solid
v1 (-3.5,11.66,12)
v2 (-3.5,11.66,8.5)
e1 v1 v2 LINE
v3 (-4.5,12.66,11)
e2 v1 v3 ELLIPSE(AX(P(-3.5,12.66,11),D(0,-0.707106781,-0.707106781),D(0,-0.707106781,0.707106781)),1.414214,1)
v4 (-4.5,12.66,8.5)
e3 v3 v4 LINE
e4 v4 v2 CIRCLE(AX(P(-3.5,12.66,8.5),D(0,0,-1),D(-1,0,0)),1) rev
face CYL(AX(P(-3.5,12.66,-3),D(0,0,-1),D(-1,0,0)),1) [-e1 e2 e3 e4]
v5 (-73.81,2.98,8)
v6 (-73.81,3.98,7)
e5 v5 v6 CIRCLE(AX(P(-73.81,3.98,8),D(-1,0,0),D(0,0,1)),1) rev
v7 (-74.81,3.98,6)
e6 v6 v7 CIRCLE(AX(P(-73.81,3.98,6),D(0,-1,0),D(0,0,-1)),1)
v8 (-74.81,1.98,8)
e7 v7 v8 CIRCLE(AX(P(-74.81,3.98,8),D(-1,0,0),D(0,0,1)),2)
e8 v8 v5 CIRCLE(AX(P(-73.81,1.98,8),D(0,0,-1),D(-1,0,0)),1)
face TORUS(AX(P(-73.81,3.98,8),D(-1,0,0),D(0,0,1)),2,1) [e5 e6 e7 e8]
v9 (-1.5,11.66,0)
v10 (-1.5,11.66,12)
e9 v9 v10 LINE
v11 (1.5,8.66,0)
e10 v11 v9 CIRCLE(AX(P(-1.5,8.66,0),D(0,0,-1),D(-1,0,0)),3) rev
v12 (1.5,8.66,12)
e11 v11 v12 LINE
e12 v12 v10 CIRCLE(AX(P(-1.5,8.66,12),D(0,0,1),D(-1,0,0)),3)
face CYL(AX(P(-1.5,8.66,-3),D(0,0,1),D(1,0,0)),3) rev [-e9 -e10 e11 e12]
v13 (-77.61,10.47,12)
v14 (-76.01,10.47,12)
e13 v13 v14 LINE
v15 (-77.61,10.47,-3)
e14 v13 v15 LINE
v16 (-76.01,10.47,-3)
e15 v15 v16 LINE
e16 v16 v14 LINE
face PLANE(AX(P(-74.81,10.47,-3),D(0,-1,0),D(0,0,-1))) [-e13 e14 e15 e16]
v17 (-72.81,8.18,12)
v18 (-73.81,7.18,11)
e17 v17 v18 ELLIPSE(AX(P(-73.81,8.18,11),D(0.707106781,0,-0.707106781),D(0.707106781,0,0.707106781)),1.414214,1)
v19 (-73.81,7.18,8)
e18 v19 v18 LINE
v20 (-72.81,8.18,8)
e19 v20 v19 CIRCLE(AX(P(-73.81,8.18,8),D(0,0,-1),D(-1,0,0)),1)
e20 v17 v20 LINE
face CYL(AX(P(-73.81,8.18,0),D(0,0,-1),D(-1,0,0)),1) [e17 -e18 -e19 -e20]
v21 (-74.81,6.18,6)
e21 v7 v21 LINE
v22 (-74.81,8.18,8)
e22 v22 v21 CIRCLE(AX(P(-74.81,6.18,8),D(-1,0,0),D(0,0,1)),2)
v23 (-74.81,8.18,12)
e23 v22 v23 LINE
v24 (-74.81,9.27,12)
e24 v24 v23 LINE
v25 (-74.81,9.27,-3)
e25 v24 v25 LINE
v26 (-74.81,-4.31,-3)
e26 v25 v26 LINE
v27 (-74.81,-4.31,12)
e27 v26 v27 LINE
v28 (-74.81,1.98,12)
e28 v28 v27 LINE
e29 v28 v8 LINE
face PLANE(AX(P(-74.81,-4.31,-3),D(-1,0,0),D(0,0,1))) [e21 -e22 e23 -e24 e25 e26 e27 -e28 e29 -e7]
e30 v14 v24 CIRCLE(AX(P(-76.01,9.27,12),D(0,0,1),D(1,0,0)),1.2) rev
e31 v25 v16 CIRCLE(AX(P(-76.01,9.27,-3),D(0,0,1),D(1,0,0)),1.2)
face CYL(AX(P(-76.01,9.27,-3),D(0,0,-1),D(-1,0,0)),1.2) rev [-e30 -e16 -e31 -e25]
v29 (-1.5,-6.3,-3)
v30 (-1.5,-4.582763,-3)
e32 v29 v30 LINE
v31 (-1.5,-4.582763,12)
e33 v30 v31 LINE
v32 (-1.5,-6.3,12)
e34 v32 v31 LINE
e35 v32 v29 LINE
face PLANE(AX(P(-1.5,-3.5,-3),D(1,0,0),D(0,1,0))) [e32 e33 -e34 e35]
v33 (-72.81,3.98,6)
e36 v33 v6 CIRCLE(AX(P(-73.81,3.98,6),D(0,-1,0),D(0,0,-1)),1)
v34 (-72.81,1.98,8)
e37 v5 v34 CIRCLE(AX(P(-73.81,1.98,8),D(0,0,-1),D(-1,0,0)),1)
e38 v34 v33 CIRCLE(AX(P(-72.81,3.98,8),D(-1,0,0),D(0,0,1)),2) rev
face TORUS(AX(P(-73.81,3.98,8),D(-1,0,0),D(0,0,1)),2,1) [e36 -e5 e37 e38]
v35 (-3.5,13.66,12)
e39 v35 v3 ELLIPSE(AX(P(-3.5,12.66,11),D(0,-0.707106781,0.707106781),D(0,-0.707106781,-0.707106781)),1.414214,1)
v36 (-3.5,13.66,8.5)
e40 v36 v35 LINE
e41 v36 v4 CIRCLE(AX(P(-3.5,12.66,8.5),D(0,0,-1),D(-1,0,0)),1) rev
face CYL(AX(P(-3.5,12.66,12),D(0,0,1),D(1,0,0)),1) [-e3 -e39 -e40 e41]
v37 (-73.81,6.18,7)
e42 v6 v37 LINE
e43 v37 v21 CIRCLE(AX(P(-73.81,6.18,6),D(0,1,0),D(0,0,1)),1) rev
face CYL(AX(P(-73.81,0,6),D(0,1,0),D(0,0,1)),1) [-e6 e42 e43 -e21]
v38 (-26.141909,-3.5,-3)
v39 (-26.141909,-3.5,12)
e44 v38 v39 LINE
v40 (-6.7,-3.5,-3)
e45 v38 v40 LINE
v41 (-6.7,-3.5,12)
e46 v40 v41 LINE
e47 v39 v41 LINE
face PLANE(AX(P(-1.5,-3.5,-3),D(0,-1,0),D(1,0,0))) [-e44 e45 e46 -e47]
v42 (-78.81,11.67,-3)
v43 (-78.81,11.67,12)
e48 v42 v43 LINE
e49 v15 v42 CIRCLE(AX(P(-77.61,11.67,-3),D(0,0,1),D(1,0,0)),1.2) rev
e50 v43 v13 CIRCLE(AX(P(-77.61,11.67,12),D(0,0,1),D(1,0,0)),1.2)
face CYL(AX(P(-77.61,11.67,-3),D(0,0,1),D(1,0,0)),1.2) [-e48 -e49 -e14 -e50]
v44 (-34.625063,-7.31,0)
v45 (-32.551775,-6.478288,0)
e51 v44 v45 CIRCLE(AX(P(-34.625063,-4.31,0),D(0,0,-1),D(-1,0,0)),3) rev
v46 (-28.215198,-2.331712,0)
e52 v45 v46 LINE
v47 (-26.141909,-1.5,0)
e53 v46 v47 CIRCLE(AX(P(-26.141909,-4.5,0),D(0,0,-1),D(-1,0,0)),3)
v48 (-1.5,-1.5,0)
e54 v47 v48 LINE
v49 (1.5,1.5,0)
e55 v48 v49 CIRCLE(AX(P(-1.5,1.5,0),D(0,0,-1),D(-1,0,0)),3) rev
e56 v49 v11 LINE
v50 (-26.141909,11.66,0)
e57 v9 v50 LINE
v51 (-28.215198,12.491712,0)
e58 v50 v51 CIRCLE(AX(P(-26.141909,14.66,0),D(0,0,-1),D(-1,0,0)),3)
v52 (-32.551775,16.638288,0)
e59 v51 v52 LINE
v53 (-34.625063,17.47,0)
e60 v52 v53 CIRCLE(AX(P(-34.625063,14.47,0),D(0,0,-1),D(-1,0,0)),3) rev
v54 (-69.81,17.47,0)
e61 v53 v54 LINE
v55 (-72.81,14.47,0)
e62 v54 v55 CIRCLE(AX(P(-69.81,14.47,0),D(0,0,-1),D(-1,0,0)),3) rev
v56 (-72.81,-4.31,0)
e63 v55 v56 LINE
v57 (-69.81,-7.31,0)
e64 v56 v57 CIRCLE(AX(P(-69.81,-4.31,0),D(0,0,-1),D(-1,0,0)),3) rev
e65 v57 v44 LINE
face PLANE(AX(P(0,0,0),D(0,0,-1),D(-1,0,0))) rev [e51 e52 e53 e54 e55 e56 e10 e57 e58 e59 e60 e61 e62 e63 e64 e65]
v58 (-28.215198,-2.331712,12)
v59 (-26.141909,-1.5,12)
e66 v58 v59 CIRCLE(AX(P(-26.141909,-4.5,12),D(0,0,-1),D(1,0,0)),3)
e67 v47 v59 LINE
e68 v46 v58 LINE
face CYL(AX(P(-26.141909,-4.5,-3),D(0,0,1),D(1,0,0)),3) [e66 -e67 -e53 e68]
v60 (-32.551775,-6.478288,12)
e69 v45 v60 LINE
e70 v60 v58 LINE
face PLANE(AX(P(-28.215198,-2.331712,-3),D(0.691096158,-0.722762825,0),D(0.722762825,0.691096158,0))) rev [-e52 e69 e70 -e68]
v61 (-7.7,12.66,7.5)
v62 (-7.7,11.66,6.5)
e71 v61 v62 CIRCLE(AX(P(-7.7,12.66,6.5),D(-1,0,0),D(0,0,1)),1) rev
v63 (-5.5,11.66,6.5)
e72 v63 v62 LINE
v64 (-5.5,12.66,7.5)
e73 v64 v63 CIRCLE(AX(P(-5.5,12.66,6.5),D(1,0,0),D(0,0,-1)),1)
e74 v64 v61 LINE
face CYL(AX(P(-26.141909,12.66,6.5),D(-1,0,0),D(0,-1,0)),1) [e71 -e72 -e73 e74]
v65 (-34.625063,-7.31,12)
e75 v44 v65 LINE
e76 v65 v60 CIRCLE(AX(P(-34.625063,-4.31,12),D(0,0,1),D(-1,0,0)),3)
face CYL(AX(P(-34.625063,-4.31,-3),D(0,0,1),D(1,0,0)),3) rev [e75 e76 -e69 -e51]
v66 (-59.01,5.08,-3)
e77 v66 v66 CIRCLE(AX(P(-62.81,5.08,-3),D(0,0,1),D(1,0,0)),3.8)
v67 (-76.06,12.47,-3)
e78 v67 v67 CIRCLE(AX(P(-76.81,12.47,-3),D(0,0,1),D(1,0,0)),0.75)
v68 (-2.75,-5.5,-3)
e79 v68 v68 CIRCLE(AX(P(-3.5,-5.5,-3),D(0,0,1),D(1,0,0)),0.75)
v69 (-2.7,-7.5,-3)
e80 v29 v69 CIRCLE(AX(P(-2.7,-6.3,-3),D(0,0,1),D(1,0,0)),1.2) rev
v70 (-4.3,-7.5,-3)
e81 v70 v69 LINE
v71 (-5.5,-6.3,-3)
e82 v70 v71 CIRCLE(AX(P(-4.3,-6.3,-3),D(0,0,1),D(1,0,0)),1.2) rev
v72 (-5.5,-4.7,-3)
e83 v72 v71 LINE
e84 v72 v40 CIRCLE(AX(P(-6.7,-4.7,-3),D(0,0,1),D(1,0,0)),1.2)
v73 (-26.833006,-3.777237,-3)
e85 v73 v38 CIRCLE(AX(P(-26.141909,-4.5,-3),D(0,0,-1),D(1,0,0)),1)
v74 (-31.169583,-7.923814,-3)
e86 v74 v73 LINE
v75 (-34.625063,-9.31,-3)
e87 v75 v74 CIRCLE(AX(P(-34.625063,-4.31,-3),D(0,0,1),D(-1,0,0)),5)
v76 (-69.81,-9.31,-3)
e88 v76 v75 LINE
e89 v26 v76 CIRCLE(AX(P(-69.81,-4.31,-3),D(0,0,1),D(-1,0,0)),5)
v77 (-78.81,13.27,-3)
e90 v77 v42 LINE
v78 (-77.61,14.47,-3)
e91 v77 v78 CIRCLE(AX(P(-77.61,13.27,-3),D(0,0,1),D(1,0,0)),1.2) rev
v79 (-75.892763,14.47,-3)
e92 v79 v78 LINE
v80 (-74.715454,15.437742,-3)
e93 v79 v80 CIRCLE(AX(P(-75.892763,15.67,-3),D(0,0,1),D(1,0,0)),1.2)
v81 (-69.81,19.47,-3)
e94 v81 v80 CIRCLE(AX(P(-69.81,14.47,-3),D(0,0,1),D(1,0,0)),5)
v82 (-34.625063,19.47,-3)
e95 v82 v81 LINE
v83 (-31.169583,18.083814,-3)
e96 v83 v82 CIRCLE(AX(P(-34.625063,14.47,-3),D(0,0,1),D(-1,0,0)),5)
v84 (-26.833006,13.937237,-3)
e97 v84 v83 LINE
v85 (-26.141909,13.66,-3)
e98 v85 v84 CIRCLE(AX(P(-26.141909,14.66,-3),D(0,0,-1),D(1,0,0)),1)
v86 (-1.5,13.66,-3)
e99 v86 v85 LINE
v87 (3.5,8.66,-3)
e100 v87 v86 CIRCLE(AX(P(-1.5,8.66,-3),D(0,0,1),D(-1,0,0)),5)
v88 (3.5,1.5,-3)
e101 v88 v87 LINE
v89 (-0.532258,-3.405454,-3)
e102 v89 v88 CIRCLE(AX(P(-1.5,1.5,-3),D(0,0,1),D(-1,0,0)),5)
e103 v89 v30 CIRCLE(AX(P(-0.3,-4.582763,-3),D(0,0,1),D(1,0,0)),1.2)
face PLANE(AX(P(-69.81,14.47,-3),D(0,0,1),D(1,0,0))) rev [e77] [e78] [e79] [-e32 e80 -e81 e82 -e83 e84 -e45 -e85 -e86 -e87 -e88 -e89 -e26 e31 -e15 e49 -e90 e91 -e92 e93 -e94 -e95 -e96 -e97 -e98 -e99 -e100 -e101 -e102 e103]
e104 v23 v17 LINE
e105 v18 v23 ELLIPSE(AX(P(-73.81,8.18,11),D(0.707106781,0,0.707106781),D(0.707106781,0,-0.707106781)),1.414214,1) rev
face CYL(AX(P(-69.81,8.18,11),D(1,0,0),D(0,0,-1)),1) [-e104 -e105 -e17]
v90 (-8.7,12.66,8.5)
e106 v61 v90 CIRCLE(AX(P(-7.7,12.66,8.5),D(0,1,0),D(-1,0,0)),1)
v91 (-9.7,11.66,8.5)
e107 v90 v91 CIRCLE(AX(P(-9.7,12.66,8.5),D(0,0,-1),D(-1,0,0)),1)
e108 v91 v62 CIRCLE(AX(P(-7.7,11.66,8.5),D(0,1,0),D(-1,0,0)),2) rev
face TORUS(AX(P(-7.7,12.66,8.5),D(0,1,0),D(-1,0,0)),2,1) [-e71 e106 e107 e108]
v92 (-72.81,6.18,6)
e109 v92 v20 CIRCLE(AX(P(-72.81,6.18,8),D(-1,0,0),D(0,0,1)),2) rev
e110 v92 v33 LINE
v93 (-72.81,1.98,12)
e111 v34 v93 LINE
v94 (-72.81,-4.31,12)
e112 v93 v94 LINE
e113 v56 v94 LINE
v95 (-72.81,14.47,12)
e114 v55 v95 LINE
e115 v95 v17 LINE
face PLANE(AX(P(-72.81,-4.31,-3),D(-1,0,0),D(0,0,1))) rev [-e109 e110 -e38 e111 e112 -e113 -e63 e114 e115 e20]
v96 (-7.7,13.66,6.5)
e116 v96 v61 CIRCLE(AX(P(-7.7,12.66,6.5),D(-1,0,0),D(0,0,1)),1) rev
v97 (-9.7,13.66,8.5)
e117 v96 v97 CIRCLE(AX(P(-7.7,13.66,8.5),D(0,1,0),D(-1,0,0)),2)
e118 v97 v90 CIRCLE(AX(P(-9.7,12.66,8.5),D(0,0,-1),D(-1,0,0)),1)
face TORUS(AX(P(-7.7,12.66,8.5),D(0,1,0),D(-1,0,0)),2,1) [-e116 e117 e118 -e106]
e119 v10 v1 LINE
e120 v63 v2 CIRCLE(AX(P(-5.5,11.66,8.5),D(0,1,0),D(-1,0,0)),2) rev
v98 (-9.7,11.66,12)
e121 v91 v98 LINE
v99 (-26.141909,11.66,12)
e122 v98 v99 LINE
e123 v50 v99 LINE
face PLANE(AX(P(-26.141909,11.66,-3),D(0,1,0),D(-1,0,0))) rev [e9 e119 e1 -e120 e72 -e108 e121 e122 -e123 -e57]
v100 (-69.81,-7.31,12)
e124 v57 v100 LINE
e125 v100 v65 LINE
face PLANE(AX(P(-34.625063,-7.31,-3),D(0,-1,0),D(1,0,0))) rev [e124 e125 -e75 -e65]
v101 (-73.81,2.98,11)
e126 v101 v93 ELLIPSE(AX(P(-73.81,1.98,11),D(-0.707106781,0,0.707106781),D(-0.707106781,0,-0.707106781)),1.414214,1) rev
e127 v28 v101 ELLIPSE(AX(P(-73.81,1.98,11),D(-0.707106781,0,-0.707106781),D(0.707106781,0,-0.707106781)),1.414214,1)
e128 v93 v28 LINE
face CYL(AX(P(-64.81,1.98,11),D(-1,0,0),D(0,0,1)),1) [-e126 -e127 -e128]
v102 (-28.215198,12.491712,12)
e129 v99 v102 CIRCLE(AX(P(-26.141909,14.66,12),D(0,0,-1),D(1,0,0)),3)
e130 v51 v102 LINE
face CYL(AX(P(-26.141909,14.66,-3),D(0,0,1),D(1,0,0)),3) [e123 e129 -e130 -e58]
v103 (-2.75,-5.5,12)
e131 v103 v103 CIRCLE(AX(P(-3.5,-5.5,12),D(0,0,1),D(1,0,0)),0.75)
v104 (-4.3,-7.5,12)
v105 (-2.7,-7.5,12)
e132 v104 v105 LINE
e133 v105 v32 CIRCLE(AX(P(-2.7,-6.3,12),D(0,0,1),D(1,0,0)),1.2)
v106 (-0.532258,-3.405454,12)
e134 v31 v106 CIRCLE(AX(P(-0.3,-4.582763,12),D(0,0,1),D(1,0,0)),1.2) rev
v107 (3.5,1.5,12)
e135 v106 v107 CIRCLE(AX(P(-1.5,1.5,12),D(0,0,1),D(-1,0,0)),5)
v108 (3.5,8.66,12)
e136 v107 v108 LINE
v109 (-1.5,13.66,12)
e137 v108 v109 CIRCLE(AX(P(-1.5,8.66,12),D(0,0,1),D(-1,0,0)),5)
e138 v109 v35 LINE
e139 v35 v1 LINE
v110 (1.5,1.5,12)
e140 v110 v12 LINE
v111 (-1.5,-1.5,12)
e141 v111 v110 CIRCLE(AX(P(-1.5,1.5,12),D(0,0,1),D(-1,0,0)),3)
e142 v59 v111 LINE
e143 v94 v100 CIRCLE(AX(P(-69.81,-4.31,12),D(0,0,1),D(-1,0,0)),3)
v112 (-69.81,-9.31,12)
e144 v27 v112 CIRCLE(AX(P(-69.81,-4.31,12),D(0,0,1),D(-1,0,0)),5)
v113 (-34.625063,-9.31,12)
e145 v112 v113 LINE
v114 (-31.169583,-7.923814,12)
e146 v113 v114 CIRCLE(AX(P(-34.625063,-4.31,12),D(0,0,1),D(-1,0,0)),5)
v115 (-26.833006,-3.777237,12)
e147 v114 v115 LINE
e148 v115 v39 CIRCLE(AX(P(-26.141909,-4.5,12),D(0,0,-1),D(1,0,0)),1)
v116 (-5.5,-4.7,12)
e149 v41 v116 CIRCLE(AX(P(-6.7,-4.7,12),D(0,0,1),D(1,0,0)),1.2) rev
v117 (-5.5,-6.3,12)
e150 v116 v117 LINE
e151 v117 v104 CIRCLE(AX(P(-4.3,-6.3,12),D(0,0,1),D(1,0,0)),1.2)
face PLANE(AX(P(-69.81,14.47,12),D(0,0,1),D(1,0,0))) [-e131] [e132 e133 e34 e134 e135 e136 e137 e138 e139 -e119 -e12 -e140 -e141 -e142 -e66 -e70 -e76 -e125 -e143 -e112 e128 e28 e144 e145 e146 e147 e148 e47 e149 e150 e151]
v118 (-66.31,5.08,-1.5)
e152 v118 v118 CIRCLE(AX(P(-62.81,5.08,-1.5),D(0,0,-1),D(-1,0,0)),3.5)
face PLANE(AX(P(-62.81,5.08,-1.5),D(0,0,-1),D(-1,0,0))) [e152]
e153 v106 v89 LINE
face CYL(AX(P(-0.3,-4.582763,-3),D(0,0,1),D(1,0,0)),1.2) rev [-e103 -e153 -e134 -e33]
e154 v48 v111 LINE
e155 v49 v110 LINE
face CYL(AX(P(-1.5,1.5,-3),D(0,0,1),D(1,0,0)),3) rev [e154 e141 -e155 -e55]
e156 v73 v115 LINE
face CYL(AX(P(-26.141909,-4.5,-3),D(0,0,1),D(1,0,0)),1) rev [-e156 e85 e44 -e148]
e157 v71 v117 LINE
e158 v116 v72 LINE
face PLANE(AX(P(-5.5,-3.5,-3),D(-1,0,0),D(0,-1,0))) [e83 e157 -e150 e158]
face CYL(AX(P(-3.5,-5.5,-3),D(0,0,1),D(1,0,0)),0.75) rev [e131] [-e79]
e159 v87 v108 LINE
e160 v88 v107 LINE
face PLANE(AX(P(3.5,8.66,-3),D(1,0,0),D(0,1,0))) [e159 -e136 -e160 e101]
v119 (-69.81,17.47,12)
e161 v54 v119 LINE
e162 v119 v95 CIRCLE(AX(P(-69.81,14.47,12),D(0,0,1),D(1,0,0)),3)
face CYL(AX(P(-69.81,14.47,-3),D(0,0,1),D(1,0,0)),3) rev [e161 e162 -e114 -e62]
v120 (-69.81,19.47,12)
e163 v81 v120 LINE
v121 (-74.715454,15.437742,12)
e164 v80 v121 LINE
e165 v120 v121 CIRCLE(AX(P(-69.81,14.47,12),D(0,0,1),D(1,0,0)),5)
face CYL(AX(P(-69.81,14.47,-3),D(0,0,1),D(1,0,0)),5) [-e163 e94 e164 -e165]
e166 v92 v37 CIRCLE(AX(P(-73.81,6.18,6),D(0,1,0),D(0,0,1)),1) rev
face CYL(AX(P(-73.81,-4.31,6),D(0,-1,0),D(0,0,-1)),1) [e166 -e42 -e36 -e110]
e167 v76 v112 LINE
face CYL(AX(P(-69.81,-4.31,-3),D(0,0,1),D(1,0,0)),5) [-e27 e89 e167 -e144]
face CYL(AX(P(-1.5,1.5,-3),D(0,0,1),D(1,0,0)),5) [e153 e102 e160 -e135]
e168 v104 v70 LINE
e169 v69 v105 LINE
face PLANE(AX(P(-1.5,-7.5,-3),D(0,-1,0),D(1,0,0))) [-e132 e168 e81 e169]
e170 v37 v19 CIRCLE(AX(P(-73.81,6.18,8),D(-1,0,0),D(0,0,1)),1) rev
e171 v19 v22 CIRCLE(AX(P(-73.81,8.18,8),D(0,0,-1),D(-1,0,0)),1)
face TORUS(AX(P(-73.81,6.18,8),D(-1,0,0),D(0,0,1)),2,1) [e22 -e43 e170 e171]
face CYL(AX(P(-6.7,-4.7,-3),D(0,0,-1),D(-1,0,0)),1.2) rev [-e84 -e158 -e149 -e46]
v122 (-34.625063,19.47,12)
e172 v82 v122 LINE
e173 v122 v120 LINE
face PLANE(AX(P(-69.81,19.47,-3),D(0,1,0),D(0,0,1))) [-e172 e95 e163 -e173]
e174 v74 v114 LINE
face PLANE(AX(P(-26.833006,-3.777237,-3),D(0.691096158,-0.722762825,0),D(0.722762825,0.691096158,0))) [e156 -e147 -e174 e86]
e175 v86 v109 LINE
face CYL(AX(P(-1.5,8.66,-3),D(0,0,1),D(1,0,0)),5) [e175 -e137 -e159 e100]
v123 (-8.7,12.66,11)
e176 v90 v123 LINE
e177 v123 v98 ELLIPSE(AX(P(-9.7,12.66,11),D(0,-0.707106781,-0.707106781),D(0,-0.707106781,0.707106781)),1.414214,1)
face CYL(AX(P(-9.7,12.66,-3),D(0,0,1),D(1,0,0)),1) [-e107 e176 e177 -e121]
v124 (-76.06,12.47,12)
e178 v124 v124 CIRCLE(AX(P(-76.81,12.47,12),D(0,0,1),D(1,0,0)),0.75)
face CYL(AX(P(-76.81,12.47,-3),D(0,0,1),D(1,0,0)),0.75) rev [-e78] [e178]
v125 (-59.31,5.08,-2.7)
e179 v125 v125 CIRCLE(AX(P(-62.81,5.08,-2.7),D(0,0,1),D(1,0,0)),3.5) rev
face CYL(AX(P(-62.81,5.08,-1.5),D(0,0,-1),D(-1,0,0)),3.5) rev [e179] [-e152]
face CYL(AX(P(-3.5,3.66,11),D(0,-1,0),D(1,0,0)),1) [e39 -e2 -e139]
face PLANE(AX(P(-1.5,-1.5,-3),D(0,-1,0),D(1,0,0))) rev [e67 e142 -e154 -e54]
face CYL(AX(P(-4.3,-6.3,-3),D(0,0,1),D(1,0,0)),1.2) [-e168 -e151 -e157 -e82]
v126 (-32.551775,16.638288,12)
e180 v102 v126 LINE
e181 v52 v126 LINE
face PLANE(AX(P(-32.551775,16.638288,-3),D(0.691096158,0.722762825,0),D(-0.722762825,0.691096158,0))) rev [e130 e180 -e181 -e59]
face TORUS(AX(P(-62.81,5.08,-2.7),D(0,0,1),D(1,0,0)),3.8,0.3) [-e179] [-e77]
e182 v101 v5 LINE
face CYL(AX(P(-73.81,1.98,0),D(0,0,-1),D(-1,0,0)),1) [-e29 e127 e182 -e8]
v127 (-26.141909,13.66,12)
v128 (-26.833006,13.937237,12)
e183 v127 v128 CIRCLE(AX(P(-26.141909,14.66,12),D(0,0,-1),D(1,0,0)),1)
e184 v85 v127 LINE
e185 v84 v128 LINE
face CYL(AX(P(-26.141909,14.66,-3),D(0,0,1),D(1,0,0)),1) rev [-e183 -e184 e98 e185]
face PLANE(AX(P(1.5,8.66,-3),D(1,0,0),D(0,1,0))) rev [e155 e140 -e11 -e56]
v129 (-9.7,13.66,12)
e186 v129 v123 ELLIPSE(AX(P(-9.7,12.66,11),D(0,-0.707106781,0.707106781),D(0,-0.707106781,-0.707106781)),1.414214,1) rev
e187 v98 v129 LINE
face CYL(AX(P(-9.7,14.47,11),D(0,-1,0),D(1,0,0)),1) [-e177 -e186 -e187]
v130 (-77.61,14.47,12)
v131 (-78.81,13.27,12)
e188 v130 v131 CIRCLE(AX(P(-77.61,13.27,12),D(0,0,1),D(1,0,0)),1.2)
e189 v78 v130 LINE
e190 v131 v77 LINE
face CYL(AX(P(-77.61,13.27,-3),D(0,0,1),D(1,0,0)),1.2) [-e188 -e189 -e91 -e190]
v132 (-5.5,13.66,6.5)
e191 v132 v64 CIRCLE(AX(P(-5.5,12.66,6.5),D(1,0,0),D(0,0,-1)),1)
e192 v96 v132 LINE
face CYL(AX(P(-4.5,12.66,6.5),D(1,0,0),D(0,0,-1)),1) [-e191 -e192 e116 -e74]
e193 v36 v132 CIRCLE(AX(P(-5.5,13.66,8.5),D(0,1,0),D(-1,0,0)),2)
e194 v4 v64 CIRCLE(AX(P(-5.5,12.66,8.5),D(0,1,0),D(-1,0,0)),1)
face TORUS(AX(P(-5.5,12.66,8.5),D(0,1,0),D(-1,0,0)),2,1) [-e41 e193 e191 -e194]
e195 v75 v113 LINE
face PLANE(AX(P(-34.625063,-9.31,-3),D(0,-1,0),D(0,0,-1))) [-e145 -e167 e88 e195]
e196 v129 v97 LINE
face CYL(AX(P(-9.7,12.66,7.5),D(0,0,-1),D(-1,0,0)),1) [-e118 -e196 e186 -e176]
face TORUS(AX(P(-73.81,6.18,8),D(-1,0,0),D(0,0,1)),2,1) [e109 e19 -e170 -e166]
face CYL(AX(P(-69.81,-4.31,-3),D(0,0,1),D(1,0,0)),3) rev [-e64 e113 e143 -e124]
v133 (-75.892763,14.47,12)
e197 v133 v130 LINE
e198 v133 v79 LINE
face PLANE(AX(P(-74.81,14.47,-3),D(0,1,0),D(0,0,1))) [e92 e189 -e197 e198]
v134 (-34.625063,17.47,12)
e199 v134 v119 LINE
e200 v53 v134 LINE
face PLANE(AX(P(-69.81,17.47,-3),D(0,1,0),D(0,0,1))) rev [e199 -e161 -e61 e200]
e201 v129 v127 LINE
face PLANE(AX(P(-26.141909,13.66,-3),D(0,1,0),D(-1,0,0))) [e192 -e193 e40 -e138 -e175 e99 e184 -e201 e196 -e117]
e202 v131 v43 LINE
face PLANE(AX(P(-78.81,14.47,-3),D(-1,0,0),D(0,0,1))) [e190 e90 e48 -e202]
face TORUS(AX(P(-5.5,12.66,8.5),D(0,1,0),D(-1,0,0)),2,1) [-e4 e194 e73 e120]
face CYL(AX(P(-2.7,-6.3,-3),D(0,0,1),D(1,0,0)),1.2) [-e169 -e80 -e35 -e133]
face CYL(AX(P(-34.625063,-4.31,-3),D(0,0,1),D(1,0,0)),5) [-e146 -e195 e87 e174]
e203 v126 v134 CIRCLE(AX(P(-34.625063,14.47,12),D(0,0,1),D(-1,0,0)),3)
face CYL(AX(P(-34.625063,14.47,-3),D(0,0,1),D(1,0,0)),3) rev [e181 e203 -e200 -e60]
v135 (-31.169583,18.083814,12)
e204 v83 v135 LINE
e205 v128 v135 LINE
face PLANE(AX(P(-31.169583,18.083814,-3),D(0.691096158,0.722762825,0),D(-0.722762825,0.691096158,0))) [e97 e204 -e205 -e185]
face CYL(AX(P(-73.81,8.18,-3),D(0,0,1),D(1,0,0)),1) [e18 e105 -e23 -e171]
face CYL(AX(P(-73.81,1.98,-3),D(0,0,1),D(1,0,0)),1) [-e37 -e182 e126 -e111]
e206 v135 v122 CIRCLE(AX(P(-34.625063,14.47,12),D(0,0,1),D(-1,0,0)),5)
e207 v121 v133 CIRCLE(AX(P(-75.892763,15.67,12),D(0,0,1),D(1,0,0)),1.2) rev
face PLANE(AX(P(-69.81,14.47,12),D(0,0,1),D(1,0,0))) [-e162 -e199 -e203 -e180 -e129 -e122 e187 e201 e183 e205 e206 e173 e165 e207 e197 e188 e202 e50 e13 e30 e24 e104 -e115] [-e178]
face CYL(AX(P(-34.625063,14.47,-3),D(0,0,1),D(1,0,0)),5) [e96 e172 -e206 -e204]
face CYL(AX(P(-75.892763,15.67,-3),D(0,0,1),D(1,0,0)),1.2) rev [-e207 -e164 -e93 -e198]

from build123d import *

# Parameters (mm, degrees)
BOSS_EXTRUDE2_DEPTH      = 12
BOSS_EXTRUDE2_DEPTH_BACK = 3
BOSS_EXTRUDE3_DEPTH      = 3
SKETCH6_W                = 5
SKETCH6_H                = 2.1
CUT_EXTRUDE1_DEPTH       = 10
SKETCH7_W                = 4.2
SKETCH7_H                = 4.5
CUT_EXTRUDE2_DEPTH       = 10
FILLET1_R                = 1
SKETCH8_W                = 4
SKETCH8_H                = 4
BOSS_EXTRUDE4_DEPTH      = 15
FILLET2_R                = 1.2
SKETCH9_R                = 0.75
CUT_EXTRUDE3_DEPTH       = 83.553600769
SKETCH10_R               = 3.5
CUT_EXTRUDE4_DEPTH       = 1.5
FILLET3_R                = 0.3


with BuildPart() as part:
    # Sketch3 → Boss-Extrude2 (new, two sides: drawn at the far end of the back side and taken through both)
    with BuildSketch(Plane.XY.offset(-BOSS_EXTRUDE2_DEPTH_BACK)):
        with BuildLine():
            Line((-69.81, 19.47), (-34.625063383, 19.47))
            ThreePointArc((-34.625063383, 19.47), (-32.763487521, 19.110531791), (-31.169582594, 18.083814123))
            Line((-31.169582594, 18.083814123), (-26.833005647, 13.937237175))
            ThreePointArc((-26.833005647, 13.937237175), (-26.514224661, 13.731893642), (-26.141909489, 13.66))
            Line((-26.141909489, 13.66), (-1.5, 13.66))
            ThreePointArc((-1.5, 13.66), (2.035533906, 12.195533906), (3.5, 8.66))
            Line((3.5, 8.66), (3.5, 1.5))
            ThreePointArc((3.5, 1.5), (2.035533906, -2.035533906), (-1.5, -3.5))
            Line((-1.5, -3.5), (-26.141909489, -3.5))
            ThreePointArc((-26.141909489, -3.5), (-26.514224661, -3.571893642), (-26.833005647, -3.777237175))
            Line((-26.833005647, -3.777237175), (-31.169582594, -7.923814123))
            ThreePointArc((-31.169582594, -7.923814123), (-32.763487521, -8.950531791), (-34.625063383, -9.31))
            Line((-34.625063383, -9.31), (-69.81, -9.31))
            ThreePointArc((-69.81, -9.31), (-73.345533906, -7.845533906), (-74.81, -4.31))
            Line((-74.81, -4.31), (-74.81, 14.47))
            ThreePointArc((-74.81, 14.47), (-73.345533906, 18.005533906), (-69.81, 19.47))
        make_face()
        with BuildLine():
            Line((-69.81, 17.47), (-34.625063383, 17.47))
            ThreePointArc((-34.625063383, 17.47), (-33.508117866, 17.254319075), (-32.55177491, 16.638288474))
            Line((-32.55177491, 16.638288474), (-28.215197962, 12.491711526))
            ThreePointArc((-28.215197962, 12.491711526), (-27.258855006, 11.875680925), (-26.141909489, 11.66))
            Line((-26.141909489, 11.66), (-1.5, 11.66))
            ThreePointArc((-1.5, 11.66), (0.621320344, 10.781320344), (1.5, 8.66))
            Line((1.5, 8.66), (1.5, 1.5))
            ThreePointArc((1.5, 1.5), (0.621320344, -0.621320344), (-1.5, -1.5))
            Line((-1.5, -1.5), (-26.141909489, -1.5))
            ThreePointArc((-26.141909489, -1.5), (-27.258855006, -1.715680925), (-28.215197962, -2.331711526))
            Line((-28.215197962, -2.331711526), (-32.55177491, -6.478288474))
            ThreePointArc((-32.55177491, -6.478288474), (-33.508117866, -7.094319075), (-34.625063383, -7.31))
            Line((-34.625063383, -7.31), (-69.81, -7.31))
            ThreePointArc((-69.81, -7.31), (-71.931320344, -6.431320344), (-72.81, -4.31))
            Line((-72.81, -4.31), (-72.81, 14.47))
            ThreePointArc((-72.81, 14.47), (-71.931320344, 16.591320344), (-69.81, 17.47))
        make_face(mode=Mode.SUBTRACT)
    extrude(amount=BOSS_EXTRUDE2_DEPTH + BOSS_EXTRUDE2_DEPTH_BACK)

    # Sketch5 → Boss-Extrude3 (add)
    with BuildSketch(Plane(origin=(0, 0, -3), x_dir=(-1, 0, 0), z_dir=(0, 0, -1))):
        with BuildLine():
            Line((72.81, 14.47), (72.81, -4.31))
            ThreePointArc((72.81, -4.31), (71.931320344, -6.431320344), (69.81, -7.31))
            Line((69.81, -7.31), (34.625063383, -7.31))
            ThreePointArc((34.625063383, -7.31), (33.508117866, -7.094319075), (32.55177491, -6.478288474))
            Line((32.55177491, -6.478288474), (28.215197962, -2.331711526))
            ThreePointArc((28.215197962, -2.331711526), (27.258855006, -1.715680925), (26.141909489, -1.5))
            Line((26.141909489, -1.5), (1.5, -1.5))
            ThreePointArc((1.5, -1.5), (-0.621320344, -0.621320344), (-1.5, 1.5))
            Line((-1.5, 1.5), (-1.5, 8.66))
            ThreePointArc((-1.5, 8.66), (-0.621320344, 10.781320344), (1.5, 11.66))
            Line((1.5, 11.66), (26.141909489, 11.66))
            ThreePointArc((26.141909489, 11.66), (27.258855006, 11.875680925), (28.215197962, 12.491711526))
            Line((28.215197962, 12.491711526), (32.55177491, 16.638288474))
            ThreePointArc((32.55177491, 16.638288474), (33.508117866, 17.254319075), (34.625063383, 17.47))
            Line((34.625063383, 17.47), (69.81, 17.47))
            ThreePointArc((69.81, 17.47), (71.931320344, 16.591320344), (72.81, 14.47))
        make_face()
    extrude(amount=-BOSS_EXTRUDE3_DEPTH)

    # Sketch6 → Cut-Extrude1 (cut)
    with BuildSketch(Plane.ZY.offset(74.81)):
        with Locations((9.5, 6.13)):
            Rectangle(SKETCH6_W, SKETCH6_H)
        with Locations((9.5, 4.03)):
            Rectangle(SKETCH6_W, SKETCH6_H)
    extrude(amount=-CUT_EXTRUDE1_DEPTH, mode=Mode.SUBTRACT)

    # Sketch7 → Cut-Extrude2 (cut)
    with BuildSketch(Plane(origin=(0, 13.66, 0), x_dir=(1, 0, 0), z_dir=(0, 1, 0))):
        with Locations((-6.6, -9.75)):
            Rectangle(SKETCH7_W, SKETCH7_H)
    extrude(amount=-CUT_EXTRUDE2_DEPTH, mode=Mode.SUBTRACT)

    # Fillet1
    fillet1_edges = [part.edges().sort_by_distance(p)[0] for p in [
        (-73.81, 2.98, 12),
        (-73.81, 7.18, 12),
        (-72.81, 5.08, 7),
        (-73.81, 2.98, 7),
        (-73.81, 7.18, 7),
        (-74.81, 7.18, 9.5),
        (-72.81, 2.98, 9.5),
        (-72.81, 7.18, 9.5),
        (-74.81, 5.08, 7),
        (-74.81, 2.98, 9.5),
        (-4.5, 12.66, 12),
        (-8.7, 11.66, 9.75),
        (-8.7, 12.66, 12),
        (-6.6, 11.66, 7.5),
        (-8.7, 12.66, 7.5),
        (-4.5, 11.66, 9.75),
        (-4.5, 12.66, 7.5),
        (-4.5, 13.66, 9.75),
        (-6.6, 13.66, 7.5),
        (-8.7, 13.66, 9.75),
    ]]
    fillet(fillet1_edges, radius=FILLET1_R - 0.0001)  # a hair under: the kernel refuses the full size

    # Sketch8 → Boss-Extrude4 (add, through all)
    with BuildSketch(Plane.XY.offset(12)):
        with Locations((-76.81, 12.47)):
            Rectangle(SKETCH8_W, SKETCH8_H)
        with Locations((-3.5, -5.5)):
            Rectangle(SKETCH8_W, SKETCH8_H)
    extrude(amount=-BOSS_EXTRUDE4_DEPTH)

    # Fillet2
    fillet2_edges = [part.edges().sort_by_distance(p)[0] for p in [
        (-1.5, -3.5, 4.5),
        (-74.81, 14.47, 4.5),
        (-74.81, 10.47, 4.5),
        (-78.81, 10.47, 4.5),
        (-78.81, 14.47, 4.5),
        (-1.5, -7.5, 4.5),
        (-5.5, -7.5, 4.5),
        (-5.5, -3.5, 4.5),
    ]]
    fillet(fillet2_edges, radius=FILLET2_R)

    # Sketch9 → Cut-Extrude3 (cut, through all)
    with BuildSketch(Plane.XY.offset(12)):
        with Locations((-76.81, 12.47)):
            Circle(SKETCH9_R)
        with Locations((-3.5, -5.5)):
            Circle(SKETCH9_R)
    extrude(amount=-CUT_EXTRUDE3_DEPTH, mode=Mode.SUBTRACT)

    # Sketch10 → Cut-Extrude4 (cut)
    with BuildSketch(Plane(origin=(0, 0, -3), x_dir=(-1, 0, 0), z_dir=(0, 0, -1))):
        with Locations((62.81, 5.08)):
            Circle(SKETCH10_R)
    extrude(amount=-CUT_EXTRUDE4_DEPTH, mode=Mode.SUBTRACT)

    # Fillet3
    fillet3_edges = [part.edges().sort_by_distance(p)[0] for p in [
        (-59.31, 5.08, -3),
    ]]
    fillet(fillet3_edges, radius=FILLET3_R)


solid = part.part
